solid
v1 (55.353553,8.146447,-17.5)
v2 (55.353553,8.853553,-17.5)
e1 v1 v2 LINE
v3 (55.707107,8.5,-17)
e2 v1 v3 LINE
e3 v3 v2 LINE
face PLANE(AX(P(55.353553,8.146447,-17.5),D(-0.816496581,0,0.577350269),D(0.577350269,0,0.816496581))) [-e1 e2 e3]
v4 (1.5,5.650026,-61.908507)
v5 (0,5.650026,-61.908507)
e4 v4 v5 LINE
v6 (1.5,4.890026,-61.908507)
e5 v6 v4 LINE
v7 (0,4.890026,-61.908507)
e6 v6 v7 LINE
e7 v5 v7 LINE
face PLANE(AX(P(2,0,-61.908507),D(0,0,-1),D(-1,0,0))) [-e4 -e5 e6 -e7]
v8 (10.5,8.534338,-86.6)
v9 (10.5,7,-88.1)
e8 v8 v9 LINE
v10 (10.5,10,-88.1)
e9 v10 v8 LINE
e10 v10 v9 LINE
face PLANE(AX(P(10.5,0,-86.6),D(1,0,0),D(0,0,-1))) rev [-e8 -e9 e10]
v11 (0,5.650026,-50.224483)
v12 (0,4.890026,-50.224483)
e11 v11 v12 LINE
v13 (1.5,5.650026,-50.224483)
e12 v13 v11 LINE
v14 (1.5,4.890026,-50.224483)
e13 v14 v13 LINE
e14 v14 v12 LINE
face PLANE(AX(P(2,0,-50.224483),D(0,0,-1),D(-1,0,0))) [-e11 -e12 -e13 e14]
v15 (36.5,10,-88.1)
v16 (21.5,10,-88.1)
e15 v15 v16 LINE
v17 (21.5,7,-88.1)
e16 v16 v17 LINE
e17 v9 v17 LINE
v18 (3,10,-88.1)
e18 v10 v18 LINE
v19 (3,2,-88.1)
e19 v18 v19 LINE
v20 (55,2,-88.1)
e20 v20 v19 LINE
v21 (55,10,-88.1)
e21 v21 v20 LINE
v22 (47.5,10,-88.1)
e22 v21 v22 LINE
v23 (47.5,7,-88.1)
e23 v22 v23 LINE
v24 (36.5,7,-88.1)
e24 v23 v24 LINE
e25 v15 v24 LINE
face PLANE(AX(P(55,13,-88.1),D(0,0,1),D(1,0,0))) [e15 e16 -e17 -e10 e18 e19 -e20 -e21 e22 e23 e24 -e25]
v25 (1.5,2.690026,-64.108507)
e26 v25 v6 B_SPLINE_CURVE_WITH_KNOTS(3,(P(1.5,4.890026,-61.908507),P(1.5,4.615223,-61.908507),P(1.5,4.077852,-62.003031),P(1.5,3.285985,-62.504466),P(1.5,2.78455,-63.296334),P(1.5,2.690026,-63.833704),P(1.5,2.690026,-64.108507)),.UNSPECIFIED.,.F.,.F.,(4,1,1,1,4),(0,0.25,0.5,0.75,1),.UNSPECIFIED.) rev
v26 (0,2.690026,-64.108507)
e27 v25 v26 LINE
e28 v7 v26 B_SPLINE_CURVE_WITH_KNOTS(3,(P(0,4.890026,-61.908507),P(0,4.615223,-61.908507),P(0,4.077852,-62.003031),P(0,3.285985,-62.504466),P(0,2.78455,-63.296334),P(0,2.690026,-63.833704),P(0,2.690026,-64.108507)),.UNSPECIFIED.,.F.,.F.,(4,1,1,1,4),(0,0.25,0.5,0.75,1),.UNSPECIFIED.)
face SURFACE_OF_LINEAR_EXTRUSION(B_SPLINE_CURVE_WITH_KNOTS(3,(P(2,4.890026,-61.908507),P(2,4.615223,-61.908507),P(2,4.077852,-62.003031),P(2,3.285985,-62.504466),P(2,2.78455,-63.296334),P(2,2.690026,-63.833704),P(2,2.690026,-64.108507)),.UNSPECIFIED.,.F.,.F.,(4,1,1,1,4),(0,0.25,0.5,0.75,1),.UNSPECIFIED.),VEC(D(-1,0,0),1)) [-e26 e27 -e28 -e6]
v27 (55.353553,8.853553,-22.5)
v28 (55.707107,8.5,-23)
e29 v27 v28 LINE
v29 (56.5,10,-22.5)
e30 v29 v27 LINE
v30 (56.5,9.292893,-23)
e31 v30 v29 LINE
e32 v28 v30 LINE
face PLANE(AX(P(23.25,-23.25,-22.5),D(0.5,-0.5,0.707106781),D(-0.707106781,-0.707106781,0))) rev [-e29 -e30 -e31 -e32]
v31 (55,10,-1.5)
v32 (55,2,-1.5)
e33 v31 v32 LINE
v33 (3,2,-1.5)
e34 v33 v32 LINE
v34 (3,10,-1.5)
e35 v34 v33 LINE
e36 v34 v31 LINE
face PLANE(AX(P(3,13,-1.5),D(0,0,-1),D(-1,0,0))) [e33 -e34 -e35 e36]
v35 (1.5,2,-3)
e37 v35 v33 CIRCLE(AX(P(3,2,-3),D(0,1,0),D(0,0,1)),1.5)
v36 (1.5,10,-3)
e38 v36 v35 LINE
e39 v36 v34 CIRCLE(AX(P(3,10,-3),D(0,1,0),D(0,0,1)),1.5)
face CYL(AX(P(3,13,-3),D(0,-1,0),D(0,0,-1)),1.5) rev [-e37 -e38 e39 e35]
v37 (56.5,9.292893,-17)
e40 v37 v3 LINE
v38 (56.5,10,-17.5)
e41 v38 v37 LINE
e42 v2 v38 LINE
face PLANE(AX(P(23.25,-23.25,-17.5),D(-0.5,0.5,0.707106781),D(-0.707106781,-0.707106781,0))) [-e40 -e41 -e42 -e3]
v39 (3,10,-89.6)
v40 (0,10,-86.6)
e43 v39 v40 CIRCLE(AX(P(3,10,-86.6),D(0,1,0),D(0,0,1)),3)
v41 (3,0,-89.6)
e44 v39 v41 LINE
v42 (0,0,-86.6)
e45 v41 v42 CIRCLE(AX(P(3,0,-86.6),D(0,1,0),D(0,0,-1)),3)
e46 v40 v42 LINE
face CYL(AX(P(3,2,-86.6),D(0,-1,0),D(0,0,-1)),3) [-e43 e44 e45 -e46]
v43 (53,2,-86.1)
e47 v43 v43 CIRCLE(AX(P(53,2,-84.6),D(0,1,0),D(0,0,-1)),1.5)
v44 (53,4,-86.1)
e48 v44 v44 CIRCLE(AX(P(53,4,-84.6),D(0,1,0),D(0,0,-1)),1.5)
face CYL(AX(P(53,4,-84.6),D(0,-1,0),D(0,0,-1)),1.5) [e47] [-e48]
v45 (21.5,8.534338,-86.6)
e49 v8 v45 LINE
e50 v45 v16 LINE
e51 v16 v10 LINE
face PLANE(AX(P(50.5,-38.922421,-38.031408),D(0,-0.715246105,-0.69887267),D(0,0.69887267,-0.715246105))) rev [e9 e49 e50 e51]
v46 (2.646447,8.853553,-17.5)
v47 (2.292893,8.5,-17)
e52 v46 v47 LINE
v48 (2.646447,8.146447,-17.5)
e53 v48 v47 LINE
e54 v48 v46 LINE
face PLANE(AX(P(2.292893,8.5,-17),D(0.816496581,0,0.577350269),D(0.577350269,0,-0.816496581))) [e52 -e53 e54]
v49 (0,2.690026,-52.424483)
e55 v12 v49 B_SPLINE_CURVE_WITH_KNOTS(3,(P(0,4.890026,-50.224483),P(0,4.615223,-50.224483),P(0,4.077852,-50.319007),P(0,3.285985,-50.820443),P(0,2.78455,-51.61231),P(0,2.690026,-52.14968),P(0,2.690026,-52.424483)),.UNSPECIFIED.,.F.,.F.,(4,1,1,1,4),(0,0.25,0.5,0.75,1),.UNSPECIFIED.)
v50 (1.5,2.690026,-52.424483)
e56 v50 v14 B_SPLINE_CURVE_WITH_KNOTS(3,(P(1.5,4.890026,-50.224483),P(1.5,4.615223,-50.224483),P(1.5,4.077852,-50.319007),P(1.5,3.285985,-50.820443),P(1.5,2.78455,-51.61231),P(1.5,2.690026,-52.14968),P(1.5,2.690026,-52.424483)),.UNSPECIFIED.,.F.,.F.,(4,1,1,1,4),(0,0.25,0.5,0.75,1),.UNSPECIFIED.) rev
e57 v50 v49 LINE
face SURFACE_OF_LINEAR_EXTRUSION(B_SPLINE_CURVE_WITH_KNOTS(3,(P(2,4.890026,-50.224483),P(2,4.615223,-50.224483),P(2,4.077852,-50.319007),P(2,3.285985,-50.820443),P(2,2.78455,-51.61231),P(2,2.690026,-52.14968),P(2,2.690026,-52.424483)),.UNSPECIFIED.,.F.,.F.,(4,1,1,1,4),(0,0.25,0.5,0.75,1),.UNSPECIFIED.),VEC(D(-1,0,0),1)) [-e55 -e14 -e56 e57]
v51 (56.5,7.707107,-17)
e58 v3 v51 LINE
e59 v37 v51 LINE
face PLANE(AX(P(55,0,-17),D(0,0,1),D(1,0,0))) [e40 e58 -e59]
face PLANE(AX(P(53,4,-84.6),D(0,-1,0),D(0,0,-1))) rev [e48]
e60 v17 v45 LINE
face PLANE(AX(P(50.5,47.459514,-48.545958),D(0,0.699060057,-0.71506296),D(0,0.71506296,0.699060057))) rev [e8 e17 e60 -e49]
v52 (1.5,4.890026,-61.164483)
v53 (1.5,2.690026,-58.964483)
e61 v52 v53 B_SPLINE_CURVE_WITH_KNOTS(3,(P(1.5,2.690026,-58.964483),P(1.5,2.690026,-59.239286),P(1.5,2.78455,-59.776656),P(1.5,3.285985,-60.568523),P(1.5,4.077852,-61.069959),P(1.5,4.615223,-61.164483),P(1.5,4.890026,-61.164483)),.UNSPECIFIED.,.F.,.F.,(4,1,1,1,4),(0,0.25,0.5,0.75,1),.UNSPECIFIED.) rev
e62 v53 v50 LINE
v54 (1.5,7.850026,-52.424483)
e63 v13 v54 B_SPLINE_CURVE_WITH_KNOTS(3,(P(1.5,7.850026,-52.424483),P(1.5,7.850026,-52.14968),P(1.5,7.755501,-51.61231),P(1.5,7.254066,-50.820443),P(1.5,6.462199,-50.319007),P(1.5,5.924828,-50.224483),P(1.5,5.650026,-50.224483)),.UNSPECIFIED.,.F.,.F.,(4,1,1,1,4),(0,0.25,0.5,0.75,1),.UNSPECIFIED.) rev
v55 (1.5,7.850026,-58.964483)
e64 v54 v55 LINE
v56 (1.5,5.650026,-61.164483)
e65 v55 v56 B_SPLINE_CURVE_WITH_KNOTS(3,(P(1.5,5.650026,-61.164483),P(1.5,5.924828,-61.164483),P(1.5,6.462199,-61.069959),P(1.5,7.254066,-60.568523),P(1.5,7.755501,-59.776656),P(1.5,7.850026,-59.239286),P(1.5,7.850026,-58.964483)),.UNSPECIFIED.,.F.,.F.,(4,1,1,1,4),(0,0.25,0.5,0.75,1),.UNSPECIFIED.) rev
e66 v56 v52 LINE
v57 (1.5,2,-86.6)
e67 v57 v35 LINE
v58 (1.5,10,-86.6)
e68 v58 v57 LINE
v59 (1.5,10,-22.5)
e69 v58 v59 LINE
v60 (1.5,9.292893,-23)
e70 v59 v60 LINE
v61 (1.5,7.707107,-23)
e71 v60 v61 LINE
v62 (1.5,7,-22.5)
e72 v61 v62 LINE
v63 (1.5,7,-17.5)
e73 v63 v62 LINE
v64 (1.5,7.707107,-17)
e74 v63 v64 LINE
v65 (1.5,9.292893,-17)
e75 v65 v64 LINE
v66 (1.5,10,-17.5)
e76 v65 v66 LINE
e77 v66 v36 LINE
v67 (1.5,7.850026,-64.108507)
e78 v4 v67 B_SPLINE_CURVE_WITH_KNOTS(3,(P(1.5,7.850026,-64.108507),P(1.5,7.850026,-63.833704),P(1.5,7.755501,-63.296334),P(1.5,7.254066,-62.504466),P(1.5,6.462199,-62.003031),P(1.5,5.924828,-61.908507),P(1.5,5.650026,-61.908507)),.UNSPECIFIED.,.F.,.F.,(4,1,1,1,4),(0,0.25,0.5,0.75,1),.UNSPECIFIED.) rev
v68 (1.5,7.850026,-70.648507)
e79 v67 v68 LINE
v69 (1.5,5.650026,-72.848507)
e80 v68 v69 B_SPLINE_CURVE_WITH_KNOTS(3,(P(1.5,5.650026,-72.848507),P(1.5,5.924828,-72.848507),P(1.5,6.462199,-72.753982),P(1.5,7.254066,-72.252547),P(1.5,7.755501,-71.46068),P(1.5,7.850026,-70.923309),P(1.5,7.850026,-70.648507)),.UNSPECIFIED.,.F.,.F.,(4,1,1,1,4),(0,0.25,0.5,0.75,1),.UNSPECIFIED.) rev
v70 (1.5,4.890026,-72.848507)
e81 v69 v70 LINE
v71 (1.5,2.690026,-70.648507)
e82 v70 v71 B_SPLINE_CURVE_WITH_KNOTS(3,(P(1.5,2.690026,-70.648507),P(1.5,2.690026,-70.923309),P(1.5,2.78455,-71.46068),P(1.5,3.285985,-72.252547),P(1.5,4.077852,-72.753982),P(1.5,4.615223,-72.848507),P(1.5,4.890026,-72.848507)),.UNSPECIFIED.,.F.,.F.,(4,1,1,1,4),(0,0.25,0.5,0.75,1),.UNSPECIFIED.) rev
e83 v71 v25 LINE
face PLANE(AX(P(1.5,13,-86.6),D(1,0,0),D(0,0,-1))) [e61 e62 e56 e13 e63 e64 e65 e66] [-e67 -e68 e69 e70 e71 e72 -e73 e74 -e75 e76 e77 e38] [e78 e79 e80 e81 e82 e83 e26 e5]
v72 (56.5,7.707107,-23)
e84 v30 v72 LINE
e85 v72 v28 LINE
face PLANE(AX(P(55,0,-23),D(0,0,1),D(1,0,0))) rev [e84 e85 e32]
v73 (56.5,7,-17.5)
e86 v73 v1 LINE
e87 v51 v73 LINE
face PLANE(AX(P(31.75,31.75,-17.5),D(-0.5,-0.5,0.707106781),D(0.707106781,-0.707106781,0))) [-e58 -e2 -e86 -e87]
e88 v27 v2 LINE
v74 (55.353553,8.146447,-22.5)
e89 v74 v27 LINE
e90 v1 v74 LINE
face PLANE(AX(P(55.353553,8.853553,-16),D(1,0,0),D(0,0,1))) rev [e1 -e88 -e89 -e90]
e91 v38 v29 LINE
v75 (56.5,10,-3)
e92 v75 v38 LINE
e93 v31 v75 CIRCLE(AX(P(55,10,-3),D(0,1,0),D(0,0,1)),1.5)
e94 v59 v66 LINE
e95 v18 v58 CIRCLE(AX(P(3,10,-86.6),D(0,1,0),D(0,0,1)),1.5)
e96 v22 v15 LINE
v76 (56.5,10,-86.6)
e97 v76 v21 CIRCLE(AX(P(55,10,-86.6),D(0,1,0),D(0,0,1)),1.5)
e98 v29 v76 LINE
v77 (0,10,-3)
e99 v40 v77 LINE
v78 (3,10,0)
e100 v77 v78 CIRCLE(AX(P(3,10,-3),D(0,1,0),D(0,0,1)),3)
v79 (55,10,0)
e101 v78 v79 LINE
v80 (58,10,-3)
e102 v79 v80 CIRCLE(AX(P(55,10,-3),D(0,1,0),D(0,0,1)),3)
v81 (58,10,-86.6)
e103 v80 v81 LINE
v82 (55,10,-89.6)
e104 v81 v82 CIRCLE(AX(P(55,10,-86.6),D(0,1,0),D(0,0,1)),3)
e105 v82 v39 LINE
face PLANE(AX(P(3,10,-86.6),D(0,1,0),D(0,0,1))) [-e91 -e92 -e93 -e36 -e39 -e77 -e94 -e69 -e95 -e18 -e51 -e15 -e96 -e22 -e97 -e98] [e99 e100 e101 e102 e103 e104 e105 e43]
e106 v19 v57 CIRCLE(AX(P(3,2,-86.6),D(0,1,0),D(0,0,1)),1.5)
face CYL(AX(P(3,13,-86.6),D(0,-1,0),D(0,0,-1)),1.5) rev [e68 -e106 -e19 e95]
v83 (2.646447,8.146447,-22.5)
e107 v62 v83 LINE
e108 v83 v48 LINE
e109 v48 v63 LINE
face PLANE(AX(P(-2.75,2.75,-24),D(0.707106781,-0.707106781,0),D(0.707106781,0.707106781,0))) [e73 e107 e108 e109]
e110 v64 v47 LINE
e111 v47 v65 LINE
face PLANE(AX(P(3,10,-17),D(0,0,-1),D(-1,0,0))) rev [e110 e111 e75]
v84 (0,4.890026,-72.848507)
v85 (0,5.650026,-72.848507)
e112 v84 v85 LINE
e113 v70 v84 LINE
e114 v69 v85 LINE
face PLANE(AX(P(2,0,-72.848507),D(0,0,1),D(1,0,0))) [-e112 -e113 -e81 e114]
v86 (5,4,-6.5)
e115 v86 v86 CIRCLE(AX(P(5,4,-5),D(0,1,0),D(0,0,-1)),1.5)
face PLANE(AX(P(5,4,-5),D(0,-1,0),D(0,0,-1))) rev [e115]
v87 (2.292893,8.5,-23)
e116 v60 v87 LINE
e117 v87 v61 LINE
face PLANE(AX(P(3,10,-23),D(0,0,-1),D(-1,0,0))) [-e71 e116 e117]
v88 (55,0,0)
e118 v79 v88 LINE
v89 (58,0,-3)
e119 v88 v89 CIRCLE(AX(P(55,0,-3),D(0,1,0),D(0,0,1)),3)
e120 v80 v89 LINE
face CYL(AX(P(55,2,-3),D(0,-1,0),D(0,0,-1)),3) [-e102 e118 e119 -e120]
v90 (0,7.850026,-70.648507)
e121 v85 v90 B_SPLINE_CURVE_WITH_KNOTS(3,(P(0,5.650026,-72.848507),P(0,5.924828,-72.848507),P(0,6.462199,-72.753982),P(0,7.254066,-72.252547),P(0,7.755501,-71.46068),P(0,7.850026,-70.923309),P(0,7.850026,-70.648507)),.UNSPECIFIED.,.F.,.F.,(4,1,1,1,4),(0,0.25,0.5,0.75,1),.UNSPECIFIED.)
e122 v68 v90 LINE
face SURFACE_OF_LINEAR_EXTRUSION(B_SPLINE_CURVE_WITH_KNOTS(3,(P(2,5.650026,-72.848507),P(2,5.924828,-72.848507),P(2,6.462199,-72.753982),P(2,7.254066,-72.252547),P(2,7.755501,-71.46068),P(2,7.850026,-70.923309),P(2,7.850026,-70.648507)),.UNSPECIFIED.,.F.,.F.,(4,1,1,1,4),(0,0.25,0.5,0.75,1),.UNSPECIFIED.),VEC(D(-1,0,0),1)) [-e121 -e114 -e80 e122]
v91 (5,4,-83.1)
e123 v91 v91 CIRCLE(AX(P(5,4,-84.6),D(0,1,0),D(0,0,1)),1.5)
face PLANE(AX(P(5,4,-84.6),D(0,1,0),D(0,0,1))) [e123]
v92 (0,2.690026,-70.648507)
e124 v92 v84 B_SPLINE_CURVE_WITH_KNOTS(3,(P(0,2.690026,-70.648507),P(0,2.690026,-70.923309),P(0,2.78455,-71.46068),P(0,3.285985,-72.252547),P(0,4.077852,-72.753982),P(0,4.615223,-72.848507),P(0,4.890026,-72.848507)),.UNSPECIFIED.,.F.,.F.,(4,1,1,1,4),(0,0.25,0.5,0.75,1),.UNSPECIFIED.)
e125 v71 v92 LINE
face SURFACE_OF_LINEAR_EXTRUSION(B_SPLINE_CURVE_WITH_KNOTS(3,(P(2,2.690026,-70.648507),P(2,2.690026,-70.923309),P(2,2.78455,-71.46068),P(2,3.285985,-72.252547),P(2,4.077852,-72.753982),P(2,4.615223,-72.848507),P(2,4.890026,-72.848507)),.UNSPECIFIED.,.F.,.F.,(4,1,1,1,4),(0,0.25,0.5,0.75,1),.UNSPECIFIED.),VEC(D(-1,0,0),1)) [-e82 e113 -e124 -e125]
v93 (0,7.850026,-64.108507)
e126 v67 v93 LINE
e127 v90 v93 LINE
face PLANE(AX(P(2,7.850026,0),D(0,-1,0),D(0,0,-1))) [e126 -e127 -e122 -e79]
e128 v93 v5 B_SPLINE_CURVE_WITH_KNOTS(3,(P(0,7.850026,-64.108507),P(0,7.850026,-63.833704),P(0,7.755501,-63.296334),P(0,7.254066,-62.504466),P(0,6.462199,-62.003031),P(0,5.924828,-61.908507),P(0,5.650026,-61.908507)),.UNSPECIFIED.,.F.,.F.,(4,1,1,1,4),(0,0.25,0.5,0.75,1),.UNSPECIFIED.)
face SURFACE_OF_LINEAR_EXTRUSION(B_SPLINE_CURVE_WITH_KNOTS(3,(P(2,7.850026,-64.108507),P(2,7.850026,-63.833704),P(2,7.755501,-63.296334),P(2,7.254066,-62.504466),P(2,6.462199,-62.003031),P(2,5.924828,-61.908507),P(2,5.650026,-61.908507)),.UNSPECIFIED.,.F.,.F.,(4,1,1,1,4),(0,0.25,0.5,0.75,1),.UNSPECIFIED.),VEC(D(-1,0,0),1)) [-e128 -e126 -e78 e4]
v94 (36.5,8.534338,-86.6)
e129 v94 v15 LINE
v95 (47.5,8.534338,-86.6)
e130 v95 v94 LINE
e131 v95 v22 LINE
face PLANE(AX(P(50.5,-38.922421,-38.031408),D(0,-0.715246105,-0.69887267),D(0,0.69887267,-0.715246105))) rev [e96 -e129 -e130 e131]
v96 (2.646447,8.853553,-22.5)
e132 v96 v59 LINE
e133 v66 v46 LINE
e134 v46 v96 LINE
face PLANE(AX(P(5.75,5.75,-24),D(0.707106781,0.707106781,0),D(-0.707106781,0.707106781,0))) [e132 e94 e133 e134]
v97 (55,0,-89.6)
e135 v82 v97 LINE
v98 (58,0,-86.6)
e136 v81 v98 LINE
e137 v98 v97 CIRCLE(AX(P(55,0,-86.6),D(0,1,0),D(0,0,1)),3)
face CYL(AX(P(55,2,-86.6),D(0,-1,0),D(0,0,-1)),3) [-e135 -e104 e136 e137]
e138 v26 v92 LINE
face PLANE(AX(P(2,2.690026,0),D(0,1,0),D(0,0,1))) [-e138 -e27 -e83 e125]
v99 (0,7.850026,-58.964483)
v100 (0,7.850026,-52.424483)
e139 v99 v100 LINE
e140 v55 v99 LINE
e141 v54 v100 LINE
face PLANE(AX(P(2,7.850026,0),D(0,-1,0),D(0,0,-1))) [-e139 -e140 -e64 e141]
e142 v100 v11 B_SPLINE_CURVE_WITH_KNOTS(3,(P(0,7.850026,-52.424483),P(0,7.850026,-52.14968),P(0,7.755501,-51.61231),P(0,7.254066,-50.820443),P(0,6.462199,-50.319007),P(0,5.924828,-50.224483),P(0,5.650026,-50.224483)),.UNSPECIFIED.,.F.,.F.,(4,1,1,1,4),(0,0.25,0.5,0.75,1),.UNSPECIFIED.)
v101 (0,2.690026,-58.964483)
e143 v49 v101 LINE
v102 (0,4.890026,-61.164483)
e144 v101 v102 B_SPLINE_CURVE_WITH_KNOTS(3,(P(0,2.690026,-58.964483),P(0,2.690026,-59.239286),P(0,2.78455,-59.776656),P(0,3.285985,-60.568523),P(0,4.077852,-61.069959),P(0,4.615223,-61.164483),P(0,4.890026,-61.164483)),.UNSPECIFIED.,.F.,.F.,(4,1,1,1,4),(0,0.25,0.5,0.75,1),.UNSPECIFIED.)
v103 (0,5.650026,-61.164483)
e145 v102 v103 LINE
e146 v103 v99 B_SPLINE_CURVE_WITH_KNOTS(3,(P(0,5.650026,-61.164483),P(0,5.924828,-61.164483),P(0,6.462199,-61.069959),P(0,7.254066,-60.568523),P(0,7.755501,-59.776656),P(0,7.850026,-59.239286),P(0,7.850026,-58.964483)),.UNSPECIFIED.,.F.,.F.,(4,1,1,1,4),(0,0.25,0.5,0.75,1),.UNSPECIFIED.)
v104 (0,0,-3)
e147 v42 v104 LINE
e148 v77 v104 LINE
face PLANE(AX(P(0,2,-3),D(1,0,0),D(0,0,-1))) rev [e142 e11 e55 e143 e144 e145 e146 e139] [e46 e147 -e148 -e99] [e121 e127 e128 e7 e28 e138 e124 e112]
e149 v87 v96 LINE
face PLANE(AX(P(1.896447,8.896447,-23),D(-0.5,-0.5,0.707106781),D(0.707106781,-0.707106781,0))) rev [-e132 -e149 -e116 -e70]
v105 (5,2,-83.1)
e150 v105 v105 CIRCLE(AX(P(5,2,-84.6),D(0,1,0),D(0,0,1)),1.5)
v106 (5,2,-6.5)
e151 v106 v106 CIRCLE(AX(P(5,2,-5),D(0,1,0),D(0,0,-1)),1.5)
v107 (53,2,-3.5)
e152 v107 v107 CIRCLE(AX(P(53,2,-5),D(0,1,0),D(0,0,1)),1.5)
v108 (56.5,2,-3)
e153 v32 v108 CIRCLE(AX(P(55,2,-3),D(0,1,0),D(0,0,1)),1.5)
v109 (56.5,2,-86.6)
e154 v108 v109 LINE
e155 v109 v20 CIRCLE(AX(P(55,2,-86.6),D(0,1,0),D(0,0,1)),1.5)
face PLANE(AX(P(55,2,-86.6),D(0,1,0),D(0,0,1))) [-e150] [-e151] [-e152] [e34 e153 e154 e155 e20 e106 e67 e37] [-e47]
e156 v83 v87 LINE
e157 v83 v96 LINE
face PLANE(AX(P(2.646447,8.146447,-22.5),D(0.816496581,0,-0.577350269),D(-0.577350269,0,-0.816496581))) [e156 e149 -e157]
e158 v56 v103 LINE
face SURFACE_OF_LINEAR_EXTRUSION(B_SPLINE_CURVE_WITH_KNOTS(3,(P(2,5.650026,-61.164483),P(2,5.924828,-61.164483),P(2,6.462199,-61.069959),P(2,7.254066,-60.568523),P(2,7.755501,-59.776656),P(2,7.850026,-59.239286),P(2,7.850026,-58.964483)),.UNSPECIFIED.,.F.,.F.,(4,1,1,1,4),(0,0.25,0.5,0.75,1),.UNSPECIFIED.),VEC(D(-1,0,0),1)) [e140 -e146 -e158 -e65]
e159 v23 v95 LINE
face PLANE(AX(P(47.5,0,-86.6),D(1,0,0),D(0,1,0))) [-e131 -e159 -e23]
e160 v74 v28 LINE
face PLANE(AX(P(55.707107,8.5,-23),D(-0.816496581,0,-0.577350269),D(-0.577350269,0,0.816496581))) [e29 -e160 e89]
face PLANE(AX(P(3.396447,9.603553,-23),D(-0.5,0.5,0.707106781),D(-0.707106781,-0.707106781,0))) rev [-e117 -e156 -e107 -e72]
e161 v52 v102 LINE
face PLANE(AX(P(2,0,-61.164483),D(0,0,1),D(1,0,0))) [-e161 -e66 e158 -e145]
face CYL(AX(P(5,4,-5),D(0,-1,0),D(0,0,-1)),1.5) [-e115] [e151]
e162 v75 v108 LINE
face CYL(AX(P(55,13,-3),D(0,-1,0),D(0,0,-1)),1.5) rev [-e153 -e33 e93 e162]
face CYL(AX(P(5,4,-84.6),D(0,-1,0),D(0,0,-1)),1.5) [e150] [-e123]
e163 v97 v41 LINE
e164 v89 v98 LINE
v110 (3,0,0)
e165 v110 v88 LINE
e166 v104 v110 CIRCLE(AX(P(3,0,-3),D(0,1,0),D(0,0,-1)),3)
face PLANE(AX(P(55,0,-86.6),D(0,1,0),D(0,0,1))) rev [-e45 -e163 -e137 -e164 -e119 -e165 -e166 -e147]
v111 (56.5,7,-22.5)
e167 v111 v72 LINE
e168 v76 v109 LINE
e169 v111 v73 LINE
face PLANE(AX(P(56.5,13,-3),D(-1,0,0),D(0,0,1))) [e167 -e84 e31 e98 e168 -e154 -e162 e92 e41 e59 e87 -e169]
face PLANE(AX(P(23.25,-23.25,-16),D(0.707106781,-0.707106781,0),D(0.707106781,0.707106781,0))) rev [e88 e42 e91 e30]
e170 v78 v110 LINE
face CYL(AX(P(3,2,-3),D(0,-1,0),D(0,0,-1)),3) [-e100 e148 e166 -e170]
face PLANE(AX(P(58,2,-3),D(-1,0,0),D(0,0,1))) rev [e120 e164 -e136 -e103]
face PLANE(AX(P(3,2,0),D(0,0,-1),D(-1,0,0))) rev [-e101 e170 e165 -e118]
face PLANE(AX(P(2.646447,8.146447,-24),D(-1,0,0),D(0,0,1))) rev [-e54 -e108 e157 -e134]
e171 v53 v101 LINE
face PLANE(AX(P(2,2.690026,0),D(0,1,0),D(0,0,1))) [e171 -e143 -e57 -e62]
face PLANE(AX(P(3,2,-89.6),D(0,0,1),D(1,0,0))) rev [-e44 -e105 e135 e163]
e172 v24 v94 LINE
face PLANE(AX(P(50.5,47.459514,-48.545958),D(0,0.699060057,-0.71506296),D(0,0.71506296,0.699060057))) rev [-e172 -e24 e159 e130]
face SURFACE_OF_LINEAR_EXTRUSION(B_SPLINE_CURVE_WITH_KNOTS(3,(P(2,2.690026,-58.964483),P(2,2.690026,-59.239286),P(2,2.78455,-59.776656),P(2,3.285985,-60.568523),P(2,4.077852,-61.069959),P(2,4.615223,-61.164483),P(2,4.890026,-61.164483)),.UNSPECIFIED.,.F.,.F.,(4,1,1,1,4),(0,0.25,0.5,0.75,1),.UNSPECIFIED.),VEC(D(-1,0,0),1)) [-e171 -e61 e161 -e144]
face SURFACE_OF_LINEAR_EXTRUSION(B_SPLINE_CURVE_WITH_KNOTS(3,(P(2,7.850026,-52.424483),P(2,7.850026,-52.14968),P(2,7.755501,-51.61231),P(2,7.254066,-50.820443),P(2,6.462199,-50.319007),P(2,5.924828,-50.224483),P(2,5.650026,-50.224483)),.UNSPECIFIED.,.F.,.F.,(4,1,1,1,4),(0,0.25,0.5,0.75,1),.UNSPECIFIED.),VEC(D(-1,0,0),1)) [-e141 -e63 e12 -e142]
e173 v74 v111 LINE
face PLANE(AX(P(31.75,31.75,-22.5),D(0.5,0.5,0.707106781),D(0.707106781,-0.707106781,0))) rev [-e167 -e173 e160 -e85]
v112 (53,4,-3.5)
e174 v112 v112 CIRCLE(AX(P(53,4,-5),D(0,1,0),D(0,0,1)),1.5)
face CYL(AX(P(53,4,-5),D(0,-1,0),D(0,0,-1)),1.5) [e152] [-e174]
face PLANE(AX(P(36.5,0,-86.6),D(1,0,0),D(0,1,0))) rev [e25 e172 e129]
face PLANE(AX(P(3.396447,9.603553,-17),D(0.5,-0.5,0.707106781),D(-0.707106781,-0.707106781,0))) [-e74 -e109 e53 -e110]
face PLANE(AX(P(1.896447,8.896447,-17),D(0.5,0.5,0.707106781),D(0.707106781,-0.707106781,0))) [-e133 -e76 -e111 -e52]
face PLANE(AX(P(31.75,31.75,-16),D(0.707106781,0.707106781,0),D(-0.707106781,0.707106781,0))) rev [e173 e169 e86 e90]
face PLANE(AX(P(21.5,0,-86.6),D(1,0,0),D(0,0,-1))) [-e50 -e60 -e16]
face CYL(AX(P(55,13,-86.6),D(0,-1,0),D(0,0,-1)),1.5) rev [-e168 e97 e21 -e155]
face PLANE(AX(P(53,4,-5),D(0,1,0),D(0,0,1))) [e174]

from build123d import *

# Parameters (mm, degrees)
EXTRUDE_1_DEPTH     = 2
EXTRUDE_2_DEPTH     = 11
SKETCH_5_R          = 1.5
EXTRUDE_3_DEPTH     = 2
CUT_EXTRUDE_1_DEPTH = 2
CUT_EXTRUDE_START   = -3
CUT_EXTRUDE_2_DEPTH = 3
SKETCH_8_W          = 11
SKETCH_8_H          = 3
EXTRUDE_4_DEPTH     = 1.5
CUT_EXTRUDE_3_DEPTH = 40
SKETCH_11_W         = 6
SKETCH_11_H         = 3
EXTRUDE_5_DEPTH     = 1.5
CUT_EXTRUDE_4_DEPTH = 7
SKETCH_13_W         = 6
SKETCH_13_H         = 3
EXTRUDE_6_DEPTH     = 1.5
CUT_EXTRUDE_5_DEPTH = 7
CHAMFER_1_SIZE      = 0.5
CHAMFER_2_SIZE      = 0.5


with BuildPart() as part:
    # 草图1 → 凸台-拉伸1 (new body)
    with BuildSketch(Plane(origin=(0, 0, 0), x_dir=(1, 0, 0), z_dir=(0, 1, 0))):
        with BuildLine():
            Line((3, 0), (55, 0))
            ThreePointArc((55, 0), (57.121320344, 0.878679656), (58, 3))
            Line((58, 3), (58, 86.6))
            ThreePointArc((58, 86.6), (57.121320344, 88.721320344), (55, 89.6))
            Line((55, 89.6), (3, 89.6))
            ThreePointArc((3, 89.6), (0.878679656, 88.721320344), (0, 86.6))
            Line((0, 86.6), (0, 3))
            ThreePointArc((0, 3), (0.878679656, 0.878679656), (3, 0))
        make_face()
    extrude(amount=EXTRUDE_1_DEPTH)

    # 草图3 → 凸台-拉伸2 (add)
    with BuildSketch(Plane(origin=(0, 2, 0), x_dir=(1, 0, 0), z_dir=(0, 1, 0))):
        with BuildLine():
            Line((0, 86.6), (0, 3))
            ThreePointArc((0, 3), (0.878679656, 0.878679656), (3, 0))
            Line((3, 0), (55, 0))
            ThreePointArc((55, 0), (57.121320344, 0.878679656), (58, 3))
            Line((58, 3), (58, 86.6))
            ThreePointArc((58, 86.6), (57.121320344, 88.721320344), (55, 89.6))
            Line((55, 89.6), (3, 89.6))
            ThreePointArc((3, 89.6), (0.878679656, 88.721320344), (0, 86.6))
        make_face()
        with BuildLine():
            Line((1.5, 86.6), (1.5, 3))
            ThreePointArc((1.5, 3), (1.939339828, 1.939339828), (3, 1.5))
            Line((3, 1.5), (55, 1.5))
            ThreePointArc((55, 1.5), (56.060660172, 1.939339828), (56.5, 3))
            Line((56.5, 3), (56.5, 86.6))
            ThreePointArc((56.5, 86.6), (56.060660172, 87.660660172), (55, 88.1))
            Line((55, 88.1), (3, 88.1))
            ThreePointArc((3, 88.1), (1.939339828, 87.660660172), (1.5, 86.6))
        make_face(mode=Mode.SUBTRACT)
    extrude(amount=EXTRUDE_2_DEPTH)

    # 草图5 → 凸台-拉伸3 (add)
    with BuildSketch(Plane(origin=(0, 2, 0), x_dir=(1, 0, 0), z_dir=(0, 1, 0))):
        with Locations(Location((5, 84.6, 0), (0, 0, 270))):
            Circle(SKETCH_5_R)
        with Locations(Location((53, 84.6, 0), (0, 0, 90))):
            Circle(SKETCH_5_R)
        with Locations(Location((53, 5, 0), (0, 0, 270))):
            Circle(SKETCH_5_R)
        with Locations(Location((5, 5, 0), (0, 0, 90))):
            Circle(SKETCH_5_R)
    extrude(amount=EXTRUDE_3_DEPTH)

    # 草图6 → 切除-拉伸1 (cut)
    # profile 1 of 4: a face of its own
    with BuildSketch(Plane(origin=(0, 2, -82.999537719), x_dir=(0, 1, 0), z_dir=(-1, 0, 0))):
        with BuildLine():
            add(Edge.make_bspline(
                [(3.650025513, -10.151031112), (3.92482832, -10.151031112), (4.462198601, -10.245555275), (5.25406566, -10.746990965), (5.755501349, -11.538858023), (5.850025513, -12.076228304), (5.850025513, -12.351031112)],
                knots=[0, 0, 0, 0, 0.25, 0.5, 0.75, 1, 1, 1, 1], degree=3))
            Line((5.850025513, -12.351031112), (5.850025513, -18.891031112))
            add(Edge.make_bspline(
                [(5.850025513, -18.891031112), (5.850025513, -19.165833919), (5.755501349, -19.7032042), (5.25406566, -20.495071258), (4.462198601, -20.996506948), (3.92482832, -21.091031112), (3.650025513, -21.091031112)],
                knots=[0, 0, 0, 0, 0.25, 0.5, 0.75, 1, 1, 1, 1], degree=3))
            Line((3.650025513, -21.091031112), (2.890025513, -21.091031112))
            add(Edge.make_bspline(
                [(2.890025513, -21.091031112), (2.615222706, -21.091031112), (2.077852425, -20.996506948), (1.285985366, -20.495071258), (0.784549677, -19.7032042), (0.690025513, -19.165833919), (0.690025513, -18.891031112)],
                knots=[0, 0, 0, 0, 0.25, 0.5, 0.75, 1, 1, 1, 1], degree=3))
            Line((0.690025513, -18.891031112), (0.690025513, -12.351031112))
            add(Edge.make_bspline(
                [(0.690025513, -12.351031112), (0.690025513, -12.076228304), (0.784549677, -11.538858023), (1.285985366, -10.746990965), (2.077852425, -10.245555275), (2.615222706, -10.151031112), (2.890025513, -10.151031112)],
                knots=[0, 0, 0, 0, 0.25, 0.5, 0.75, 1, 1, 1, 1], degree=3))
            Line((2.890025513, -10.151031112), (3.650025513, -10.151031112))
        make_face()
        with BuildLine():
            Line((2.890025513, -11.151031112), (3.650025513, -11.151031112))
            add(Edge.make_bspline(
                [(3.650025513, -11.151031112), (4.352969238, -11.151031112), (4.850025513, -11.648087386), (4.850025513, -12.351031112)],
                knots=[0, 0, 0, 0, 1, 1, 1, 1], degree=3, weights=[1, 0.804737854, 0.804737854, 1]))
            Line((4.850025513, -12.351031112), (4.850025513, -18.891031112))
            add(Edge.make_bspline(
                [(4.850025513, -18.891031112), (4.850025513, -19.593974837), (4.352969238, -20.091031112), (3.650025513, -20.091031112)],
                knots=[0, 0, 0, 0, 1, 1, 1, 1], degree=3, weights=[1, 0.804737854, 0.804737854, 1]))
            Line((3.650025513, -20.091031112), (2.890025513, -20.091031112))
            add(Edge.make_bspline(
                [(2.890025513, -20.091031112), (2.187081788, -20.091031112), (1.690025513, -19.593974837), (1.690025513, -18.891031112)],
                knots=[0, 0, 0, 0, 1, 1, 1, 1], degree=3, weights=[1, 0.804737854, 0.804737854, 1]))
            Line((1.690025513, -18.891031112), (1.690025513, -12.351031112))
            add(Edge.make_bspline(
                [(1.690025513, -12.351031112), (1.690025513, -11.648087386), (2.187081788, -11.151031112), (2.890025513, -11.151031112)],
                knots=[0, 0, 0, 0, 1, 1, 1, 1], degree=3, weights=[1, 0.804737854, 0.804737854, 1]))
        make_face(mode=Mode.SUBTRACT)
    # profile 2 of 4: a face of its own
    with BuildSketch(Plane(origin=(0, 2, -82.999537719), x_dir=(0, 1, 0), z_dir=(-1, 0, 0))):
        with BuildLine():
            add(Edge.make_bspline(
                [(3.650025513, -11.151031112), (4.352969238, -11.151031112), (4.850025513, -11.648087386), (4.850025513, -12.351031112)],
                knots=[0, 0, 0, 0, 1, 1, 1, 1], degree=3, weights=[1, 0.804737854, 0.804737854, 1]))
            Line((4.850025513, -12.351031112), (4.850025513, -18.891031112))
            add(Edge.make_bspline(
                [(4.850025513, -18.891031112), (4.850025513, -19.593974837), (4.352969238, -20.091031112), (3.650025513, -20.091031112)],
                knots=[0, 0, 0, 0, 1, 1, 1, 1], degree=3, weights=[1, 0.804737854, 0.804737854, 1]))
            Line((3.650025513, -20.091031112), (2.890025513, -20.091031112))
            add(Edge.make_bspline(
                [(2.890025513, -20.091031112), (2.187081788, -20.091031112), (1.690025513, -19.593974837), (1.690025513, -18.891031112)],
                knots=[0, 0, 0, 0, 1, 1, 1, 1], degree=3, weights=[1, 0.804737854, 0.804737854, 1]))
            Line((1.690025513, -18.891031112), (1.690025513, -12.351031112))
            add(Edge.make_bspline(
                [(1.690025513, -12.351031112), (1.690025513, -11.648087386), (2.187081788, -11.151031112), (2.890025513, -11.151031112)],
                knots=[0, 0, 0, 0, 1, 1, 1, 1], degree=3, weights=[1, 0.804737854, 0.804737854, 1]))
            Line((2.890025513, -11.151031112), (3.650025513, -11.151031112))
        make_face()
    # profile 3 of 4: a face of its own
    with BuildSketch(Plane(origin=(0, 2, -82.999537719), x_dir=(0, 1, 0), z_dir=(-1, 0, 0))):
        with BuildLine():
            add(Edge.make_bspline(
                [(3.650025513, -21.83505448), (3.92482832, -21.83505448), (4.462198601, -21.929578643), (5.25406566, -22.431014333), (5.755501349, -23.222881391), (5.850025513, -23.760251672), (5.850025513, -24.03505448)],
                knots=[0, 0, 0, 0, 0.25, 0.5, 0.75, 1, 1, 1, 1], degree=3))
            Line((5.850025513, -24.03505448), (5.850025513, -30.57505448))
            add(Edge.make_bspline(
                [(5.850025513, -30.57505448), (5.850025513, -30.849857287), (5.755501349, -31.387227568), (5.25406566, -32.179094626), (4.462198601, -32.680530316), (3.92482832, -32.77505448), (3.650025513, -32.77505448)],
                knots=[0, 0, 0, 0, 0.25, 0.5, 0.75, 1, 1, 1, 1], degree=3))
            Line((3.650025513, -32.77505448), (2.890025513, -32.77505448))
            add(Edge.make_bspline(
                [(2.890025513, -32.77505448), (2.615222706, -32.77505448), (2.077852425, -32.680530316), (1.285985366, -32.179094626), (0.784549677, -31.387227568), (0.690025513, -30.849857287), (0.690025513, -30.57505448)],
                knots=[0, 0, 0, 0, 0.25, 0.5, 0.75, 1, 1, 1, 1], degree=3))
            Line((0.690025513, -30.57505448), (0.690025513, -24.03505448))
            add(Edge.make_bspline(
                [(0.690025513, -24.03505448), (0.690025513, -23.760251672), (0.784549677, -23.222881391), (1.285985366, -22.431014333), (2.077852425, -21.929578643), (2.615222706, -21.83505448), (2.890025513, -21.83505448)],
                knots=[0, 0, 0, 0, 0.25, 0.5, 0.75, 1, 1, 1, 1], degree=3))
            Line((2.890025513, -21.83505448), (3.650025513, -21.83505448))
        make_face()
        with BuildLine():
            Line((2.890025513, -22.83505448), (3.650025513, -22.83505448))
            add(Edge.make_bspline(
                [(3.650025513, -22.83505448), (4.352969238, -22.83505448), (4.850025513, -23.332110755), (4.850025513, -24.03505448)],
                knots=[0, 0, 0, 0, 1, 1, 1, 1], degree=3, weights=[1, 0.804737854, 0.804737854, 1]))
            Line((4.850025513, -24.03505448), (4.850025513, -30.57505448))
            add(Edge.make_bspline(
                [(4.850025513, -30.57505448), (4.850025513, -31.277998205), (4.352969238, -31.77505448), (3.650025513, -31.77505448)],
                knots=[0, 0, 0, 0, 1, 1, 1, 1], degree=3, weights=[1, 0.804737854, 0.804737854, 1]))
            Line((3.650025513, -31.77505448), (2.890025513, -31.77505448))
            add(Edge.make_bspline(
                [(2.890025513, -31.77505448), (2.187081788, -31.77505448), (1.690025513, -31.277998205), (1.690025513, -30.57505448)],
                knots=[0, 0, 0, 0, 1, 1, 1, 1], degree=3, weights=[1, 0.804737854, 0.804737854, 1]))
            Line((1.690025513, -30.57505448), (1.690025513, -24.03505448))
            add(Edge.make_bspline(
                [(1.690025513, -24.03505448), (1.690025513, -23.332110755), (2.187081788, -22.83505448), (2.890025513, -22.83505448)],
                knots=[0, 0, 0, 0, 1, 1, 1, 1], degree=3, weights=[1, 0.804737854, 0.804737854, 1]))
        make_face(mode=Mode.SUBTRACT)
    # profile 4 of 4: a face of its own
    with BuildSketch(Plane(origin=(0, 2, -82.999537719), x_dir=(0, 1, 0), z_dir=(-1, 0, 0))):
        with BuildLine():
            add(Edge.make_bspline(
                [(3.650025513, -22.83505448), (4.352969238, -22.83505448), (4.850025513, -23.332110755), (4.850025513, -24.03505448)],
                knots=[0, 0, 0, 0, 1, 1, 1, 1], degree=3, weights=[1, 0.804737854, 0.804737854, 1]))
            Line((4.850025513, -24.03505448), (4.850025513, -30.57505448))
            add(Edge.make_bspline(
                [(4.850025513, -30.57505448), (4.850025513, -31.277998205), (4.352969238, -31.77505448), (3.650025513, -31.77505448)],
                knots=[0, 0, 0, 0, 1, 1, 1, 1], degree=3, weights=[1, 0.804737854, 0.804737854, 1]))
            Line((3.650025513, -31.77505448), (2.890025513, -31.77505448))
            add(Edge.make_bspline(
                [(2.890025513, -31.77505448), (2.187081788, -31.77505448), (1.690025513, -31.277998205), (1.690025513, -30.57505448)],
                knots=[0, 0, 0, 0, 1, 1, 1, 1], degree=3, weights=[1, 0.804737854, 0.804737854, 1]))
            Line((1.690025513, -30.57505448), (1.690025513, -24.03505448))
            add(Edge.make_bspline(
                [(1.690025513, -24.03505448), (1.690025513, -23.332110755), (2.187081788, -22.83505448), (2.890025513, -22.83505448)],
                knots=[0, 0, 0, 0, 1, 1, 1, 1], degree=3, weights=[1, 0.804737854, 0.804737854, 1]))
            Line((2.890025513, -22.83505448), (3.650025513, -22.83505448))
        make_face()
    extrude(amount=-CUT_EXTRUDE_1_DEPTH, mode=Mode.SUBTRACT)

    # 草图7 → 切除-拉伸2 (cut)
    with BuildSketch(Plane(origin=(0, 13, 0), x_dir=(1, 0, 0), z_dir=(0, 1, 0)).offset(CUT_EXTRUDE_START)):
        with BuildLine():
            Line((0, 86.6), (0, 3))
            ThreePointArc((0, 3), (0.878679656, 0.878679656), (3, 0))
            Line((3, 0), (55, 0))
            ThreePointArc((55, 0), (57.121320344, 0.878679656), (58, 3))
            Line((58, 3), (58, 86.6))
            ThreePointArc((58, 86.6), (57.121320344, 88.721320344), (55, 89.6))
            Line((55, 89.6), (3, 89.6))
            ThreePointArc((3, 89.6), (0.878679656, 88.721320344), (0, 86.6))
        make_face()
        with BuildLine():
            Line((3, 1.5), (55, 1.5))
            ThreePointArc((55, 1.5), (56.060660172, 1.939339828), (56.5, 3))
            Line((56.5, 3), (56.5, 86.6))
            ThreePointArc((56.5, 86.6), (56.060660172, 87.660660172), (55, 88.1))
            Line((55, 88.1), (3, 88.1))
            ThreePointArc((3, 88.1), (1.939339828, 87.660660172), (1.5, 86.6))
            Line((1.5, 86.6), (1.5, 3))
            ThreePointArc((1.5, 3), (1.939339828, 1.939339828), (3, 1.5))
        make_face(mode=Mode.SUBTRACT)
    extrude(amount=CUT_EXTRUDE_2_DEPTH, mode=Mode.SUBTRACT)

    # 草图8 → 凸台-拉伸4 (add)
    with BuildSketch(Plane.XY.offset(-88.1)):
        with Locations((16, 8.5)):
            Rectangle(SKETCH_8_W, SKETCH_8_H)
        with Locations((42, 8.5)):
            Rectangle(SKETCH_8_W, SKETCH_8_H)
    extrude(amount=EXTRUDE_4_DEPTH)

    # 草图10 → 切除-拉伸3 (cut)
    with BuildSketch(Plane.ZY.offset(-10.5)):
        Polygon((-86.6, 10), (-88.1, 10), (-86.6, 8.534338043), align=None)
        Polygon((-86.6, 7), (-86.6, 8.534338043), (-88.1, 7), align=None)
    extrude(amount=-CUT_EXTRUDE_3_DEPTH, mode=Mode.SUBTRACT)

    # 草图11 → 凸台-拉伸5 (add)
    with BuildSketch(Plane(origin=(1.5, 0, 0), x_dir=(0, 0, -1), z_dir=(1, 0, 0))):
        with Locations((20, 8.5)):
            Rectangle(SKETCH_11_W, SKETCH_11_H)
    extrude(amount=EXTRUDE_5_DEPTH)

    # 草图12 → 切除-拉伸4 (cut)
    with BuildSketch(Plane.XY.offset(-17)):
        Polygon((1.5, 10), (3, 8.5), (3, 10), align=None)
        Polygon((3, 7), (3, 8.5), (1.5, 7), align=None)
    extrude(amount=-CUT_EXTRUDE_4_DEPTH, mode=Mode.SUBTRACT)

    # 草图13 → 凸台-拉伸6 (add)
    with BuildSketch(Plane.ZY.offset(-56.5)):
        with Locations((-20, 8.5)):
            Rectangle(SKETCH_13_W, SKETCH_13_H)
    extrude(amount=EXTRUDE_6_DEPTH)

    # 草图15 → 切除-拉伸5 (cut)
    with BuildSketch(Plane(origin=(0, 0, -23), x_dir=(-1, 0, 0), z_dir=(0, 0, -1))):
        Polygon((-55, 10), (-56.5, 10), (-55, 8.5), align=None)
        Polygon((-55, 7), (-55, 8.5), (-56.5, 7), align=None)
    extrude(amount=-CUT_EXTRUDE_5_DEPTH, mode=Mode.SUBTRACT)

    # 倒角1
    # the kernel refuses this chamfer: 0.5 mm, written as the material it takes off along each edge
    with BuildSketch(Plane(origin=(2.528595479, 8.5, -17.333333333), x_dir=(0.49999999999999983, 0.5000000000000011, -0.7071067811865469), z_dir=(0.8164965809277256, 1.025580099404569e-15, 0.5773502691896265))) as chamfer_1_piece_1:
        Polygon((-0.353553391, 0.204124145), (0.353553391, 0.204124145), (0, -0.40824829), align=None)
    extrude(amount=0.635085296, mode=Mode.SUBTRACT)
    with BuildSketch(Plane(origin=(2.528595479, 8.5, -22.666666667), x_dir=(0.49999999999999983, 0.5000000000000011, 0.7071067811865469), z_dir=(0.8164965809277256, 1.025580099404569e-15, -0.5773502691896265))) as chamfer_1_piece_2:
        Polygon((-0.353553391, -0.204124145), (0.353553391, -0.204124145), (0, 0.40824829), align=None)
    extrude(amount=0.635085296, mode=Mode.SUBTRACT)
    with BuildSketch(Plane(origin=(3, 8.5, -15.714158506), x_dir=(-0.6873969152646602, 0.726281956876687, 0), z_dir=(0, 0, -1))) as chamfer_1_piece_3:
        Polygon((CHAMFER_1_SIZE * 0.999621916911, -CHAMFER_1_SIZE * 0.0274958766106), (-CHAMFER_1_SIZE * 0.0274958766106, -CHAMFER_1_SIZE * 0.999621916911), (0, 0), align=None)
    extrude(amount=8.571682988, mode=Mode.SUBTRACT)
    with BuildSketch(Plane(origin=(3.90922724, 7.59077276, -23), x_dir=(0.019442520806015454, 0.01944252080601548, 0.9996219169112968), z_dir=(-0.707106781186548, 0.7071067811865471, 0))) as chamfer_1_piece_4_section:
        Polygon((CHAMFER_1_SIZE * 0.999621916911, -CHAMFER_1_SIZE * 0.0274958766106), (-CHAMFER_1_SIZE * 0.0274958766106, -CHAMFER_1_SIZE * 0.999621916911), (0, 0), align=None)
    chamfer_1_piece_4 = extrude(amount=4.693003332, mode=Mode.PRIVATE)
    chamfer_1_piece_4 = split(chamfer_1_piece_4, bisect_by=Plane(origin=(1.5, 9.080759878, -22.829780558), z_dir=(1, 0, 0)), keep=Keep.TOP, mode=Mode.PRIVATE)
    add(chamfer_1_piece_4, mode=Mode.SUBTRACT)
    with BuildSketch(Plane(origin=(0.59077276, 10.90922724, -17), x_dir=(-0.706839436070673, -0.7068394360706738, 0.027495876610589054), z_dir=(0.707106781186548, -0.7071067811865471, 0))) as chamfer_1_piece_5_section:
        Polygon((CHAMFER_1_SIZE * 0.999621916911, CHAMFER_1_SIZE * 0.0274958766106), (-CHAMFER_1_SIZE * 0.0274958766106, CHAMFER_1_SIZE * 0.999621916911), (0, 0), align=None)
    chamfer_1_piece_5 = extrude(amount=4.693003332, mode=Mode.PRIVATE)
    chamfer_1_piece_5 = split(chamfer_1_piece_5, bisect_by=Plane(origin=(1.5, 9.080759878, -17.170219442), z_dir=(1, 0, 0)), keep=Keep.TOP, mode=Mode.PRIVATE)
    add(chamfer_1_piece_5, mode=Mode.SUBTRACT)
    with BuildSketch(Plane(origin=(0.59077276, 6.09077276, -23), x_dir=(0.019442520806014385, -0.019442520806014392, 0.9996219169112968), z_dir=(0.7071067811865477, 0.7071067811865474, 0))) as chamfer_1_piece_6_section:
        Polygon((CHAMFER_1_SIZE * 0.999621916911, -CHAMFER_1_SIZE * 0.0274958766106), (-CHAMFER_1_SIZE * 0.0274958766106, -CHAMFER_1_SIZE * 0.999621916911), (0, 0), align=None)
    chamfer_1_piece_6 = extrude(amount=4.693003332, mode=Mode.PRIVATE)
    chamfer_1_piece_6 = split(chamfer_1_piece_6, bisect_by=Plane(origin=(1.5, 7.919240122, -22.829780558), z_dir=(1, 0, 0)), keep=Keep.TOP, mode=Mode.PRIVATE)
    add(chamfer_1_piece_6, mode=Mode.SUBTRACT)
    with BuildSketch(Plane(origin=(3.90922724, 9.40922724, -17), x_dir=(-0.7068394360706733, 0.7068394360706736, 0.027495876610589113), z_dir=(-0.7071067811865477, -0.7071067811865474, 0))) as chamfer_1_piece_7_section:
        Polygon((CHAMFER_1_SIZE * 0.999621916911, CHAMFER_1_SIZE * 0.0274958766106), (-CHAMFER_1_SIZE * 0.0274958766106, CHAMFER_1_SIZE * 0.999621916911), (0, 0), align=None)
    chamfer_1_piece_7 = extrude(amount=4.693003332, mode=Mode.PRIVATE)
    chamfer_1_piece_7 = split(chamfer_1_piece_7, bisect_by=Plane(origin=(1.5, 7.919240122, -17.170219442), z_dir=(1, 0, 0)), keep=Keep.TOP, mode=Mode.PRIVATE)
    add(chamfer_1_piece_7, mode=Mode.SUBTRACT)

    # 倒角2
    # the kernel refuses this chamfer: 0.5 mm, written as the material it takes off along each edge
    with BuildSketch(Plane(origin=(55.471404521, 8.5, -22.666666667), x_dir=(0, -1, 0), z_dir=(-0.8164965809277265, -8.20464079523654e-15, -0.577350269189625)), Plane(origin=(55.471404521, 8.5, -17.333333333), x_dir=(0.5000000000000033, -0.4999999999999983, 0.7071067811865465), z_dir=(-0.8164965809277265, -8.20464079523654e-15, 0.577350269189625))) as chamfer_2_piece_1:
        Polygon((-0.353553391, 0.204124145), (0.353553391, 0.204124145), (0, -0.40824829), align=None)
    extrude(amount=0.635085296, mode=Mode.SUBTRACT)
    with BuildSketch(Plane(origin=(55, 8.5, -24.285841494), x_dir=(0.687396915264656, 0.7262819568766907, 0), z_dir=(0, 0, 1))) as chamfer_2_piece_2:
        Polygon((CHAMFER_2_SIZE * 0.999621916911, -CHAMFER_2_SIZE * 0.0274958766106), (-CHAMFER_2_SIZE * 0.0274958766106, -CHAMFER_2_SIZE * 0.999621916911), (0, 0), align=None)
    extrude(amount=8.571682988, mode=Mode.SUBTRACT)
    with BuildSketch(Plane(origin=(57.40922724, 10.90922724, -17), x_dir=(-0.019442520806010305, 0.019442520806010277, -0.999621916911297), z_dir=(-0.7071067811865471, -0.707106781186548, 0))) as chamfer_2_piece_3_section:
        Polygon((CHAMFER_2_SIZE * 0.999621916911, CHAMFER_2_SIZE * 0.0274958766106), (-CHAMFER_2_SIZE * 0.0274958766106, CHAMFER_2_SIZE * 0.999621916911), (0, 0), align=None)
    chamfer_2_piece_3 = extrude(amount=4.693003332, mode=Mode.PRIVATE)
    chamfer_2_piece_3 = split(chamfer_2_piece_3, bisect_by=Plane(origin=(56.5, 9.080759878, -17.170219442), z_dir=(-1, 0, 0)), keep=Keep.TOP, mode=Mode.PRIVATE)
    add(chamfer_2_piece_3, mode=Mode.SUBTRACT)
    with BuildSketch(Plane(origin=(57.40922724, 10.90922724, -23), x_dir=(-0.019442520806013754, 0.019442520806013726, 0.9996219169112968), z_dir=(-0.7071067811865471, -0.707106781186548, 0))) as chamfer_2_piece_4_section:
        Polygon((CHAMFER_2_SIZE * 0.999621916911, -CHAMFER_2_SIZE * 0.0274958766106), (-CHAMFER_2_SIZE * 0.0274958766106, -CHAMFER_2_SIZE * 0.999621916911), (0, 0), align=None)
    chamfer_2_piece_4 = extrude(amount=4.693003332, mode=Mode.PRIVATE)
    chamfer_2_piece_4 = split(chamfer_2_piece_4, bisect_by=Plane(origin=(56.5, 9.080759878, -22.829780558), z_dir=(-1, 0, 0)), keep=Keep.TOP, mode=Mode.PRIVATE)
    add(chamfer_2_piece_4, mode=Mode.SUBTRACT)
    with BuildSketch(Plane(origin=(54.09077276, 9.40922724, -17), x_dir=(0.7068394360706738, 0.7068394360706729, 0.027495876610589075), z_dir=(0.7071067811865471, -0.707106781186548, 0))) as chamfer_2_piece_5_section:
        Polygon((CHAMFER_2_SIZE * 0.999621916911, -CHAMFER_2_SIZE * 0.0274958766106), (-CHAMFER_2_SIZE * 0.0274958766106, -CHAMFER_2_SIZE * 0.999621916911), (0, 0), align=None)
    chamfer_2_piece_5 = extrude(amount=4.693003332, mode=Mode.PRIVATE)
    chamfer_2_piece_5 = split(chamfer_2_piece_5, bisect_by=Plane(origin=(56.5, 7.919240122, -17.170219442), z_dir=(-1, 0, 0)), keep=Keep.TOP, mode=Mode.PRIVATE)
    add(chamfer_2_piece_5, mode=Mode.SUBTRACT)
    with BuildSketch(Plane(origin=(54.09077276, 9.40922724, -23), x_dir=(-0.01944252080601548, -0.019442520806015454, 0.9996219169112968), z_dir=(0.7071067811865471, -0.707106781186548, 0))) as chamfer_2_piece_6_section:
        Polygon((CHAMFER_2_SIZE * 0.999621916911, -CHAMFER_2_SIZE * 0.0274958766106), (-CHAMFER_2_SIZE * 0.0274958766106, -CHAMFER_2_SIZE * 0.999621916911), (0, 0), align=None)
    chamfer_2_piece_6 = extrude(amount=4.693003332, mode=Mode.PRIVATE)
    chamfer_2_piece_6 = split(chamfer_2_piece_6, bisect_by=Plane(origin=(56.5, 7.919240122, -22.829780558), z_dir=(-1, 0, 0)), keep=Keep.TOP, mode=Mode.PRIVATE)
    add(chamfer_2_piece_6, mode=Mode.SUBTRACT)


solid = part.part
